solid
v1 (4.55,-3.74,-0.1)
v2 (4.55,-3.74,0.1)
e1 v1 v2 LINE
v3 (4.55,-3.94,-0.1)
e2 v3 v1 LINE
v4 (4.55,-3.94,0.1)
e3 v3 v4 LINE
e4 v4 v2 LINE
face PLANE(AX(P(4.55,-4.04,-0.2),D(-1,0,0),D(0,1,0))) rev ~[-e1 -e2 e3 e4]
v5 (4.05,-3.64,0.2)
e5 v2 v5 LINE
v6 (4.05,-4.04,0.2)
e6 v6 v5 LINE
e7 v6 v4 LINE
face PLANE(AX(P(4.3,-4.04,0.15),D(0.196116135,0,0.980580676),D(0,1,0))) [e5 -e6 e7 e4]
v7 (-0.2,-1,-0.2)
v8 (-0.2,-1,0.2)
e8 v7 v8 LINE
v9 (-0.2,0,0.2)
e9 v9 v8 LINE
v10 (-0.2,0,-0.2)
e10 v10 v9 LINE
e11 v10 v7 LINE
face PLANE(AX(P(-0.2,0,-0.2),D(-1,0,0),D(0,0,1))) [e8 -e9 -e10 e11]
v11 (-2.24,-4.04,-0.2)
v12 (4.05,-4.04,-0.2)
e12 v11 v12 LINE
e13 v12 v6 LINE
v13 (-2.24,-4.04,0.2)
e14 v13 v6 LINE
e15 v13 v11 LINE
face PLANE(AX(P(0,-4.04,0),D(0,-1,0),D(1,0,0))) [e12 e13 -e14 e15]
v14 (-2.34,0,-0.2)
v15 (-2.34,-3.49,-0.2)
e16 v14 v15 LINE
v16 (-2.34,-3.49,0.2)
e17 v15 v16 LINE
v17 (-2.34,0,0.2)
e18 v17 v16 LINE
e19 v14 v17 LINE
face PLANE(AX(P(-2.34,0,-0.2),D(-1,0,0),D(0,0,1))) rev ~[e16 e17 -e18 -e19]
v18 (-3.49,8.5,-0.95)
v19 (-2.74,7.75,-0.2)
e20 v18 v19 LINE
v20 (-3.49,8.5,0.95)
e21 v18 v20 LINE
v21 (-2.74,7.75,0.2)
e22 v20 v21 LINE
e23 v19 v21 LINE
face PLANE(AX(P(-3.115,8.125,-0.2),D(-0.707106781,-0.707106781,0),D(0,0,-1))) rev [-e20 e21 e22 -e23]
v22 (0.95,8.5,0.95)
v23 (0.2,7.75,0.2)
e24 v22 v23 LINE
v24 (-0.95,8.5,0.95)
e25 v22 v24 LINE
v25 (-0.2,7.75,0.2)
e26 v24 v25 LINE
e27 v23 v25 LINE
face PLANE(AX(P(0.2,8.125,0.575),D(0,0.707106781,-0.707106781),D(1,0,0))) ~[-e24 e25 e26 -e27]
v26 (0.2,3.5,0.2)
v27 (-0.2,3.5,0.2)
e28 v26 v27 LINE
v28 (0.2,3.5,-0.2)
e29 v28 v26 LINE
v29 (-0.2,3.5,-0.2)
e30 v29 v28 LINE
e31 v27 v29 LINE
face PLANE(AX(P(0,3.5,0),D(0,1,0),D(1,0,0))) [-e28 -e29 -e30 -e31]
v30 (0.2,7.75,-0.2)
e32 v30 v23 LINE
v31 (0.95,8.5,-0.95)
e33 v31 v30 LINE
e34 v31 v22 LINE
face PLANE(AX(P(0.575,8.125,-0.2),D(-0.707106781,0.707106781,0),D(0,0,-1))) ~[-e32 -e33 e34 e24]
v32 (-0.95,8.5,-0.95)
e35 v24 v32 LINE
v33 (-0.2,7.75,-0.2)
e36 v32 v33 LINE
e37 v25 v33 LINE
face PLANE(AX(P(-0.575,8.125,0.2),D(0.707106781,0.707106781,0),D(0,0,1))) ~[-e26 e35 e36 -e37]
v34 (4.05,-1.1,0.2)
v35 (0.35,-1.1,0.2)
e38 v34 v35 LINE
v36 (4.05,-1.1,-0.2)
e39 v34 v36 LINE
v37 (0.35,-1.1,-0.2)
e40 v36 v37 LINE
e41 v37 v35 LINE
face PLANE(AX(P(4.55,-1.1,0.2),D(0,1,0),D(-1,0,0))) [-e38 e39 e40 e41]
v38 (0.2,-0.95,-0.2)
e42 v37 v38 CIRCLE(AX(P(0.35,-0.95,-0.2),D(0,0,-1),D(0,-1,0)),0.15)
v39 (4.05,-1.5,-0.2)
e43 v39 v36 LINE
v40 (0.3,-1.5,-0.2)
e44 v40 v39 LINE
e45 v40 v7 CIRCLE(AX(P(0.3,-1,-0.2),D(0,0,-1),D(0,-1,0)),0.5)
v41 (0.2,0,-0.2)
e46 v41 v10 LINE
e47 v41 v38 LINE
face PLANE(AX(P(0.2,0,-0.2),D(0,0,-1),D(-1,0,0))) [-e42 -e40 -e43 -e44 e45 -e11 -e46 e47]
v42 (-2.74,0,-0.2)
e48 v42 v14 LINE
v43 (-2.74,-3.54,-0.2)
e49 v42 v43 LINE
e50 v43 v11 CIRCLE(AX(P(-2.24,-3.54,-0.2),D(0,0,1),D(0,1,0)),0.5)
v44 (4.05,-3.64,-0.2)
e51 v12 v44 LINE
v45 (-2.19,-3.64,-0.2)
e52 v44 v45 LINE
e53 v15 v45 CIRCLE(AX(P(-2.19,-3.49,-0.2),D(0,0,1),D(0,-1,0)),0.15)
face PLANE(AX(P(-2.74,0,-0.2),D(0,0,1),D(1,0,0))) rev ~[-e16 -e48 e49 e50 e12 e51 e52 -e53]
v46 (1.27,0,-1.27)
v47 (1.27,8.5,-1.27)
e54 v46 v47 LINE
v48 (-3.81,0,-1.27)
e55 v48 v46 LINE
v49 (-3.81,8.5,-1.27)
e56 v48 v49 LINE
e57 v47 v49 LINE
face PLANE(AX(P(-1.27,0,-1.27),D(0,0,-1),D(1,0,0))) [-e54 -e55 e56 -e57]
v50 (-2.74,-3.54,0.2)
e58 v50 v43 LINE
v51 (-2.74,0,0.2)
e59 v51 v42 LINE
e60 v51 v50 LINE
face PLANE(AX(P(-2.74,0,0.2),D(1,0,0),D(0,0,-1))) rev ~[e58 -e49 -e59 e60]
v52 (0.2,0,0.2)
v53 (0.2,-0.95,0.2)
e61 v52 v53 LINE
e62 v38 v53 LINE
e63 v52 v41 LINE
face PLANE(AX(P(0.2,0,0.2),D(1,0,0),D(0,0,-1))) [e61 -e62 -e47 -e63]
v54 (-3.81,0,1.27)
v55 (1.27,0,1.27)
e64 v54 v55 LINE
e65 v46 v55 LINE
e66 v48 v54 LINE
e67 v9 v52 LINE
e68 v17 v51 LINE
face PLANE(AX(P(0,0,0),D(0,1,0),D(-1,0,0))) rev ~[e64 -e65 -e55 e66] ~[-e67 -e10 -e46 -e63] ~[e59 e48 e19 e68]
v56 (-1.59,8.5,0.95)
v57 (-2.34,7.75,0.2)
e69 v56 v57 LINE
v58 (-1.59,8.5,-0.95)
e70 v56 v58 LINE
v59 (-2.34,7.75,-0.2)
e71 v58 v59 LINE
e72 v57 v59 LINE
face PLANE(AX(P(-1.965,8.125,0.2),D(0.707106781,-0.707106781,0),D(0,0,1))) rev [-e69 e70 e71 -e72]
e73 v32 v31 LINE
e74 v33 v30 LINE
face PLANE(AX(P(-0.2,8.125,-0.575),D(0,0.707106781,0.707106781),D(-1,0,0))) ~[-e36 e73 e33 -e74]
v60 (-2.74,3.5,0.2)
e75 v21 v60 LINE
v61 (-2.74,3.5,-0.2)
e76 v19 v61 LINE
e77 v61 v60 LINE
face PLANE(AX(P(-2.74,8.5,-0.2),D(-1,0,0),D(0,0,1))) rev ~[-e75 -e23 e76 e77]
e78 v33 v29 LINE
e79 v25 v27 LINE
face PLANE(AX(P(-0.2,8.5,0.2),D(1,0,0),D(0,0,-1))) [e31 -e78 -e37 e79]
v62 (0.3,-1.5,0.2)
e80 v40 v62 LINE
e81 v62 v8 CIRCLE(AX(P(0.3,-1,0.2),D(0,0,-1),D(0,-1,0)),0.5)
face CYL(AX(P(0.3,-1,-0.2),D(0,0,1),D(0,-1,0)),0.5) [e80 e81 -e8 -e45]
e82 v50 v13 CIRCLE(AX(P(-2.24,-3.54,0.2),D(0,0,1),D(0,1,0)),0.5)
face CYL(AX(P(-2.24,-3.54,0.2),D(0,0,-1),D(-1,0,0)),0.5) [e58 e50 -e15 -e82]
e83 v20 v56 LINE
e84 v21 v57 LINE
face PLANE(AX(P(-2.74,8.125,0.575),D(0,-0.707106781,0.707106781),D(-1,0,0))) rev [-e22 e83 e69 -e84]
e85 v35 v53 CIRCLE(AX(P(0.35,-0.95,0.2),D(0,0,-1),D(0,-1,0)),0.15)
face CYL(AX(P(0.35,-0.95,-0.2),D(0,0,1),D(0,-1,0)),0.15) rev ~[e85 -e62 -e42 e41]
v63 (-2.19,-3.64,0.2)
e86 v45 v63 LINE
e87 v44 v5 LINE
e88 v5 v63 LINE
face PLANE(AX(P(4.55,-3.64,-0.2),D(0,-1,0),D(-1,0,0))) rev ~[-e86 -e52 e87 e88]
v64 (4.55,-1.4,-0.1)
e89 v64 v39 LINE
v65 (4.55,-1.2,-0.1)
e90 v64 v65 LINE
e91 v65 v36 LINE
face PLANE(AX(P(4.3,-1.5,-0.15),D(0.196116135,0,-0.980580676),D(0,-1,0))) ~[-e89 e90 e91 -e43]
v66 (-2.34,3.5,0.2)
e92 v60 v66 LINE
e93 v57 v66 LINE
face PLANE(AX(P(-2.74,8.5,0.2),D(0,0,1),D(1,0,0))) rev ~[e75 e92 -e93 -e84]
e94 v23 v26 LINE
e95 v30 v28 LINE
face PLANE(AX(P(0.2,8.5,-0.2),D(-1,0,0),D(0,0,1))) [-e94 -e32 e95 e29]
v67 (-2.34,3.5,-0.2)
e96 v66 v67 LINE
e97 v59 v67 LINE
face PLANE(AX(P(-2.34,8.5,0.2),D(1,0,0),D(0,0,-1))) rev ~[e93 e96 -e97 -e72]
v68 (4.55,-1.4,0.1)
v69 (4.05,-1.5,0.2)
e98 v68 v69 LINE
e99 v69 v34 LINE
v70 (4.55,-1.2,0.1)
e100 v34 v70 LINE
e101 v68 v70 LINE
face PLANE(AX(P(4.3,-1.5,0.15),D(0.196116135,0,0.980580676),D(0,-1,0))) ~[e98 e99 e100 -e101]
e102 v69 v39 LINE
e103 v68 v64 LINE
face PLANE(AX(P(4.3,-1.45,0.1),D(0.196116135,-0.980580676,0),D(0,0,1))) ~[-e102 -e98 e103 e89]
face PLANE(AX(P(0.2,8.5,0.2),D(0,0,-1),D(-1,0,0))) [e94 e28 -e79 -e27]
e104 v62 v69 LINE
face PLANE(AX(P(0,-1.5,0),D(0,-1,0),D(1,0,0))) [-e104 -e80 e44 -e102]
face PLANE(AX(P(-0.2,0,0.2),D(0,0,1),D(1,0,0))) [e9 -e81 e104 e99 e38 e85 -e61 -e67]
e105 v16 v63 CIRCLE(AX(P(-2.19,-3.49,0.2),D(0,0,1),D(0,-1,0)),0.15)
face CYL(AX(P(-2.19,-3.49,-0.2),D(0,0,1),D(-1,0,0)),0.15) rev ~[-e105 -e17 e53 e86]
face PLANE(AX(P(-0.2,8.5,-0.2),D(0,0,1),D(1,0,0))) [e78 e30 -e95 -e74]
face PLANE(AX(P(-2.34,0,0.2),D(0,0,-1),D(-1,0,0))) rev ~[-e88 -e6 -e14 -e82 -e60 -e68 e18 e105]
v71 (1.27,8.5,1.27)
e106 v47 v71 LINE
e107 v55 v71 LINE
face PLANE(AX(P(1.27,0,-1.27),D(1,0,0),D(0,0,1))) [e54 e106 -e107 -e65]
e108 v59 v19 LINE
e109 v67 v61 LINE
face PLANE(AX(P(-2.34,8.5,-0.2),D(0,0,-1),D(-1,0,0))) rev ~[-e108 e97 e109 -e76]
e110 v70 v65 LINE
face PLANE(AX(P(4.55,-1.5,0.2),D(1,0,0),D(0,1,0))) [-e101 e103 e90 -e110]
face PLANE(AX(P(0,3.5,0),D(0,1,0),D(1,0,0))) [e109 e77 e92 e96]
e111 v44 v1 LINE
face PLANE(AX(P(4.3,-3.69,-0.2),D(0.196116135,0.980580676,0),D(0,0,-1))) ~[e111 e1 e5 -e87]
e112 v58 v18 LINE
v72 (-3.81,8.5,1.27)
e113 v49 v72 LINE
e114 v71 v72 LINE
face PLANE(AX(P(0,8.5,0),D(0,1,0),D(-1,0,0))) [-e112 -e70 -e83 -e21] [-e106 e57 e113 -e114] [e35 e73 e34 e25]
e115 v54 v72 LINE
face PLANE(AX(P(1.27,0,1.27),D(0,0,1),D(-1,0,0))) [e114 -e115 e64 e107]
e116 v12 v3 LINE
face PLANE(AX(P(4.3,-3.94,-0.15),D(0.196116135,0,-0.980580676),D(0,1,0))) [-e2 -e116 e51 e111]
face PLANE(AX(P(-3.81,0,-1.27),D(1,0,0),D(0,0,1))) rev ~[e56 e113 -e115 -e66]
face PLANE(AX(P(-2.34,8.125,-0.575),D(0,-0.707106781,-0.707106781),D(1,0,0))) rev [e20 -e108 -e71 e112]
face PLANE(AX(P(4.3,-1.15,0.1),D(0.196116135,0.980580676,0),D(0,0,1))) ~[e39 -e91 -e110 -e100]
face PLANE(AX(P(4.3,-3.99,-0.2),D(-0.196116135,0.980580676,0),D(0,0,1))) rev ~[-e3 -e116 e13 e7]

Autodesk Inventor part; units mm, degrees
ref_plane "YZ Plane" through (0, 0, 0) normal (1, 0, 0) x (0, 1, 0)
ref_plane "XZ Plane" through (0, 0, 0) normal (0, 1, 0) x (-1, 0, 0)
ref_plane "XY Plane" through (0, 0, 0) normal (0, 0, 1) x (1, 0, 0)
sketch "Sketch1" plane through (0, 0, 0) normal (0, 1, 0) x (-1, 0, 0)
  line L0 (-1.27, 1.27) -> (1.27, 1.27)
  line L1 (1.27, 1.27) -> (1.27, -1.27)
  line L2 (1.27, -1.27) -> (-1.27, -1.27)
  line L3 (-1.27, -1.27) -> (-1.27, 1.27)
  line L4 (-1.27, 1.27) -> (1.27, -1.27) construction
  line L5 (1.27, 1.27) -> (-1.27, -1.27) construction
  line L6 (1.27, -1.27) -> (3.81, -1.27)
  line L7 (3.81, -1.27) -> (3.81, 1.27)
  line L8 (3.81, 1.27) -> (1.27, 1.27)
  line L9 (1.27, 1.27) -> (1.27, -1.27)
  point P0 (0, 0)
  dimension "d0" = 2.54
  dimension "d1" = 2.54
extrude "Extrusion1" add sketch "Sketch1" along normal blind 8.5
sketch "Sketch2" plane through (0, 8.5, 0) normal (0, 1, 0) x (1, 0, 0)
  line L0 (0.2, -0.2) -> (-0.2, -0.2)
  line L1 (-0.2, -0.2) -> (-0.2, 0.2)
  line L2 (-0.2, 0.2) -> (0.2, 0.2)
  line L3 (0.2, 0.2) -> (0.2, -0.2)
  line L4 (0.2, -0.2) -> (-0.2, 0.2) construction
  line L5 (-0.2, -0.2) -> (0.2, 0.2) construction
  line L6 (-2.34, 0.2) -> (-2.74, 0.2)
  line L7 (-2.74, 0.2) -> (-2.74, -0.2)
  line L8 (-2.74, -0.2) -> (-2.34, -0.2)
  line L9 (-2.34, -0.2) -> (-2.34, 0.2)
  line L10 (-2.34, 0.2) -> (-2.74, -0.2) construction
  line L11 (-2.74, 0.2) -> (-2.34, -0.2) construction
  point P0 (0, 0)
  point P1 (-2.54, 0)
  dimension "d4" = 0.4
  dimension "d5" = 0.4
  dimension "d45" = 0.4
  dimension "d46" = 2.54
extrude "Extrusion2" cut sketch "Sketch2" against normal blind 5
chamfer "Chamfer1" distance 0.75 angle 45 8 edges at (0, 8.5, 0.2) (-0.2, 8.5, 0) (0, 8.5, -0.2) (0.2, 8.5, 0) (-2.54, 8.5, -0.2) (-2.74, 8.5, 0) (-2.54, 8.5, 0.2) (-2.34, 8.5, 0)
sketch "Sketch3" plane through (0, 0, 0) normal (0, -1, 0) x (1, 0, 0)
  line L0 (-0.2, 0.2) -> (0.2, 0.2)
  line L1 (0.2, 0.2) -> (0.2, -0.2)
  line L2 (0.2, -0.2) -> (-0.2, -0.2)
  line L3 (-0.2, -0.2) -> (-0.2, 0.2)
  line L4 (-0.2, 0.2) -> (0.2, -0.2) construction
  line L5 (0.2, 0.2) -> (-0.2, -0.2) construction
  point P0 (0, 0)
  dimension "d11" = 0.4
  dimension "d12" = 0.4
extrude "Extrusion3" add sketch "Sketch3" along normal blind 1.5
sketch "Sketch4" plane through (-0.2, 0, 0.2) normal (0, 0, 1) x (1, 0, 0)
  line L0 (0, -1.5) -> (4.75, -1.5)
  line L1 (4.75, -1.5) -> (4.75, -1.1)
  line L2 (4.75, -1.1) -> (0, -1.1)
  line L3 (0, -1.1) -> (0, -1.5)
  point P0 (0.2, 0)
  dimension "d27" = 0.4
  dimension "d28" = 4.75
extrude "Extrusion4" add sketch "Sketch4" against normal up to surface (0.4 mm away)
fillet "Fillet1" radius 0.5 1 edges at (-0.2, -1.5, 0)
fillet "Fillet2" radius 0.15 1 edges at (0.2, -1.1, 0)
chamfer "Chamfer6" distance 0.5 distance2 0.1 1 edges at (4.55, -1.3, 0.2) measured on face at (1.7333, -1.3667, 0.2)
chamfer "Chamfer7" distance 0.5 distance2 0.1 1 edges at (4.55, -1.1, -0.05) measured on face at (2.9833, -1.1, -0.0667)
chamfer "Chamfer8" distance 0.1 distance2 0.5 1 edges at (4.55, -1.35, -0.2) measured on face at (4.55, -1.4, 0)
chamfer "Chamfer9" distance 0.1 distance2 0.5 1 edges at (4.55, -1.5, 0) measured on face at (4.55, -1.4, 0.0333)
sketch "Sketch5" plane through (0, 0, 0) normal (0, -1, 0) x (1, 0, 0)
  line L0 (-2.74, -0.2) -> (-2.34, -0.2) projected
  line L1 (-1.59, 0.95) -> (-2.34, 0.2) projected
  line L2 (-2.74, -0.2) -> (-2.34, -0.2)
  line L3 (-2.34, -0.2) -> (-2.34, 0.2)
  line L4 (-2.34, 0.2) -> (-2.74, 0.2)
  line L5 (-2.74, 0.2) -> (-2.74, -0.2)
  point P0 (0, 0)
extrude "Extrusion5" add sketch "Sketch5" along normal blind 4.04
sketch "Sketch6" plane through (-2.34, 0, -0.2) normal (0, 0, -1) x (-1, 0, 0)
  line L0 (0.4, 0) -> (0.4, -4.04) projected
  line L1 (0.4, -4.04) -> (-6.89, -4.04)
  line L2 (-6.89, -4.04) -> (-6.89, -3.64)
  line L3 (-6.89, -3.64) -> (0.4, -3.64)
  line L4 (0.4, -3.64) -> (0.4, -4.04)
  point P0 (-2.34, 0)
  dimension "d49" = 0.4
extrude "Extrusion6" add sketch "Sketch6" against normal up to surface (0.4 mm away)
fillet "Fillet3" radius 0.5 1 edges at (-2.74, -4.04, 0)
fillet "Fillet4" radius 0.15 1 edges at (-2.34, -3.64, 0)
chamfer "Chamfer10" distance 0.1 distance2 0.5 1 edges at (4.55, -3.84, 0.2) measured on face at (4.55, -3.7733, -0.0667)
chamfer "Chamfer11" distance 0.1 distance2 0.5 1 edges at (4.55, -3.64, -0.05) measured on face at (4.55, -3.7733, -0.1)
chamfer "Chamfer12" distance 0.5 distance2 0.1 1 edges at (4.55, -4.04, -0.05) measured on face at (2.12, -4.04, -0.0667)
chamfer "Chamfer13" distance 0.5 distance2 0.1 1 edges at (4.55, -3.84, -0.2) measured on face at (-0.1267, -3.9067, -0.2)
properties part number "FemaleHederPin_2_90"
